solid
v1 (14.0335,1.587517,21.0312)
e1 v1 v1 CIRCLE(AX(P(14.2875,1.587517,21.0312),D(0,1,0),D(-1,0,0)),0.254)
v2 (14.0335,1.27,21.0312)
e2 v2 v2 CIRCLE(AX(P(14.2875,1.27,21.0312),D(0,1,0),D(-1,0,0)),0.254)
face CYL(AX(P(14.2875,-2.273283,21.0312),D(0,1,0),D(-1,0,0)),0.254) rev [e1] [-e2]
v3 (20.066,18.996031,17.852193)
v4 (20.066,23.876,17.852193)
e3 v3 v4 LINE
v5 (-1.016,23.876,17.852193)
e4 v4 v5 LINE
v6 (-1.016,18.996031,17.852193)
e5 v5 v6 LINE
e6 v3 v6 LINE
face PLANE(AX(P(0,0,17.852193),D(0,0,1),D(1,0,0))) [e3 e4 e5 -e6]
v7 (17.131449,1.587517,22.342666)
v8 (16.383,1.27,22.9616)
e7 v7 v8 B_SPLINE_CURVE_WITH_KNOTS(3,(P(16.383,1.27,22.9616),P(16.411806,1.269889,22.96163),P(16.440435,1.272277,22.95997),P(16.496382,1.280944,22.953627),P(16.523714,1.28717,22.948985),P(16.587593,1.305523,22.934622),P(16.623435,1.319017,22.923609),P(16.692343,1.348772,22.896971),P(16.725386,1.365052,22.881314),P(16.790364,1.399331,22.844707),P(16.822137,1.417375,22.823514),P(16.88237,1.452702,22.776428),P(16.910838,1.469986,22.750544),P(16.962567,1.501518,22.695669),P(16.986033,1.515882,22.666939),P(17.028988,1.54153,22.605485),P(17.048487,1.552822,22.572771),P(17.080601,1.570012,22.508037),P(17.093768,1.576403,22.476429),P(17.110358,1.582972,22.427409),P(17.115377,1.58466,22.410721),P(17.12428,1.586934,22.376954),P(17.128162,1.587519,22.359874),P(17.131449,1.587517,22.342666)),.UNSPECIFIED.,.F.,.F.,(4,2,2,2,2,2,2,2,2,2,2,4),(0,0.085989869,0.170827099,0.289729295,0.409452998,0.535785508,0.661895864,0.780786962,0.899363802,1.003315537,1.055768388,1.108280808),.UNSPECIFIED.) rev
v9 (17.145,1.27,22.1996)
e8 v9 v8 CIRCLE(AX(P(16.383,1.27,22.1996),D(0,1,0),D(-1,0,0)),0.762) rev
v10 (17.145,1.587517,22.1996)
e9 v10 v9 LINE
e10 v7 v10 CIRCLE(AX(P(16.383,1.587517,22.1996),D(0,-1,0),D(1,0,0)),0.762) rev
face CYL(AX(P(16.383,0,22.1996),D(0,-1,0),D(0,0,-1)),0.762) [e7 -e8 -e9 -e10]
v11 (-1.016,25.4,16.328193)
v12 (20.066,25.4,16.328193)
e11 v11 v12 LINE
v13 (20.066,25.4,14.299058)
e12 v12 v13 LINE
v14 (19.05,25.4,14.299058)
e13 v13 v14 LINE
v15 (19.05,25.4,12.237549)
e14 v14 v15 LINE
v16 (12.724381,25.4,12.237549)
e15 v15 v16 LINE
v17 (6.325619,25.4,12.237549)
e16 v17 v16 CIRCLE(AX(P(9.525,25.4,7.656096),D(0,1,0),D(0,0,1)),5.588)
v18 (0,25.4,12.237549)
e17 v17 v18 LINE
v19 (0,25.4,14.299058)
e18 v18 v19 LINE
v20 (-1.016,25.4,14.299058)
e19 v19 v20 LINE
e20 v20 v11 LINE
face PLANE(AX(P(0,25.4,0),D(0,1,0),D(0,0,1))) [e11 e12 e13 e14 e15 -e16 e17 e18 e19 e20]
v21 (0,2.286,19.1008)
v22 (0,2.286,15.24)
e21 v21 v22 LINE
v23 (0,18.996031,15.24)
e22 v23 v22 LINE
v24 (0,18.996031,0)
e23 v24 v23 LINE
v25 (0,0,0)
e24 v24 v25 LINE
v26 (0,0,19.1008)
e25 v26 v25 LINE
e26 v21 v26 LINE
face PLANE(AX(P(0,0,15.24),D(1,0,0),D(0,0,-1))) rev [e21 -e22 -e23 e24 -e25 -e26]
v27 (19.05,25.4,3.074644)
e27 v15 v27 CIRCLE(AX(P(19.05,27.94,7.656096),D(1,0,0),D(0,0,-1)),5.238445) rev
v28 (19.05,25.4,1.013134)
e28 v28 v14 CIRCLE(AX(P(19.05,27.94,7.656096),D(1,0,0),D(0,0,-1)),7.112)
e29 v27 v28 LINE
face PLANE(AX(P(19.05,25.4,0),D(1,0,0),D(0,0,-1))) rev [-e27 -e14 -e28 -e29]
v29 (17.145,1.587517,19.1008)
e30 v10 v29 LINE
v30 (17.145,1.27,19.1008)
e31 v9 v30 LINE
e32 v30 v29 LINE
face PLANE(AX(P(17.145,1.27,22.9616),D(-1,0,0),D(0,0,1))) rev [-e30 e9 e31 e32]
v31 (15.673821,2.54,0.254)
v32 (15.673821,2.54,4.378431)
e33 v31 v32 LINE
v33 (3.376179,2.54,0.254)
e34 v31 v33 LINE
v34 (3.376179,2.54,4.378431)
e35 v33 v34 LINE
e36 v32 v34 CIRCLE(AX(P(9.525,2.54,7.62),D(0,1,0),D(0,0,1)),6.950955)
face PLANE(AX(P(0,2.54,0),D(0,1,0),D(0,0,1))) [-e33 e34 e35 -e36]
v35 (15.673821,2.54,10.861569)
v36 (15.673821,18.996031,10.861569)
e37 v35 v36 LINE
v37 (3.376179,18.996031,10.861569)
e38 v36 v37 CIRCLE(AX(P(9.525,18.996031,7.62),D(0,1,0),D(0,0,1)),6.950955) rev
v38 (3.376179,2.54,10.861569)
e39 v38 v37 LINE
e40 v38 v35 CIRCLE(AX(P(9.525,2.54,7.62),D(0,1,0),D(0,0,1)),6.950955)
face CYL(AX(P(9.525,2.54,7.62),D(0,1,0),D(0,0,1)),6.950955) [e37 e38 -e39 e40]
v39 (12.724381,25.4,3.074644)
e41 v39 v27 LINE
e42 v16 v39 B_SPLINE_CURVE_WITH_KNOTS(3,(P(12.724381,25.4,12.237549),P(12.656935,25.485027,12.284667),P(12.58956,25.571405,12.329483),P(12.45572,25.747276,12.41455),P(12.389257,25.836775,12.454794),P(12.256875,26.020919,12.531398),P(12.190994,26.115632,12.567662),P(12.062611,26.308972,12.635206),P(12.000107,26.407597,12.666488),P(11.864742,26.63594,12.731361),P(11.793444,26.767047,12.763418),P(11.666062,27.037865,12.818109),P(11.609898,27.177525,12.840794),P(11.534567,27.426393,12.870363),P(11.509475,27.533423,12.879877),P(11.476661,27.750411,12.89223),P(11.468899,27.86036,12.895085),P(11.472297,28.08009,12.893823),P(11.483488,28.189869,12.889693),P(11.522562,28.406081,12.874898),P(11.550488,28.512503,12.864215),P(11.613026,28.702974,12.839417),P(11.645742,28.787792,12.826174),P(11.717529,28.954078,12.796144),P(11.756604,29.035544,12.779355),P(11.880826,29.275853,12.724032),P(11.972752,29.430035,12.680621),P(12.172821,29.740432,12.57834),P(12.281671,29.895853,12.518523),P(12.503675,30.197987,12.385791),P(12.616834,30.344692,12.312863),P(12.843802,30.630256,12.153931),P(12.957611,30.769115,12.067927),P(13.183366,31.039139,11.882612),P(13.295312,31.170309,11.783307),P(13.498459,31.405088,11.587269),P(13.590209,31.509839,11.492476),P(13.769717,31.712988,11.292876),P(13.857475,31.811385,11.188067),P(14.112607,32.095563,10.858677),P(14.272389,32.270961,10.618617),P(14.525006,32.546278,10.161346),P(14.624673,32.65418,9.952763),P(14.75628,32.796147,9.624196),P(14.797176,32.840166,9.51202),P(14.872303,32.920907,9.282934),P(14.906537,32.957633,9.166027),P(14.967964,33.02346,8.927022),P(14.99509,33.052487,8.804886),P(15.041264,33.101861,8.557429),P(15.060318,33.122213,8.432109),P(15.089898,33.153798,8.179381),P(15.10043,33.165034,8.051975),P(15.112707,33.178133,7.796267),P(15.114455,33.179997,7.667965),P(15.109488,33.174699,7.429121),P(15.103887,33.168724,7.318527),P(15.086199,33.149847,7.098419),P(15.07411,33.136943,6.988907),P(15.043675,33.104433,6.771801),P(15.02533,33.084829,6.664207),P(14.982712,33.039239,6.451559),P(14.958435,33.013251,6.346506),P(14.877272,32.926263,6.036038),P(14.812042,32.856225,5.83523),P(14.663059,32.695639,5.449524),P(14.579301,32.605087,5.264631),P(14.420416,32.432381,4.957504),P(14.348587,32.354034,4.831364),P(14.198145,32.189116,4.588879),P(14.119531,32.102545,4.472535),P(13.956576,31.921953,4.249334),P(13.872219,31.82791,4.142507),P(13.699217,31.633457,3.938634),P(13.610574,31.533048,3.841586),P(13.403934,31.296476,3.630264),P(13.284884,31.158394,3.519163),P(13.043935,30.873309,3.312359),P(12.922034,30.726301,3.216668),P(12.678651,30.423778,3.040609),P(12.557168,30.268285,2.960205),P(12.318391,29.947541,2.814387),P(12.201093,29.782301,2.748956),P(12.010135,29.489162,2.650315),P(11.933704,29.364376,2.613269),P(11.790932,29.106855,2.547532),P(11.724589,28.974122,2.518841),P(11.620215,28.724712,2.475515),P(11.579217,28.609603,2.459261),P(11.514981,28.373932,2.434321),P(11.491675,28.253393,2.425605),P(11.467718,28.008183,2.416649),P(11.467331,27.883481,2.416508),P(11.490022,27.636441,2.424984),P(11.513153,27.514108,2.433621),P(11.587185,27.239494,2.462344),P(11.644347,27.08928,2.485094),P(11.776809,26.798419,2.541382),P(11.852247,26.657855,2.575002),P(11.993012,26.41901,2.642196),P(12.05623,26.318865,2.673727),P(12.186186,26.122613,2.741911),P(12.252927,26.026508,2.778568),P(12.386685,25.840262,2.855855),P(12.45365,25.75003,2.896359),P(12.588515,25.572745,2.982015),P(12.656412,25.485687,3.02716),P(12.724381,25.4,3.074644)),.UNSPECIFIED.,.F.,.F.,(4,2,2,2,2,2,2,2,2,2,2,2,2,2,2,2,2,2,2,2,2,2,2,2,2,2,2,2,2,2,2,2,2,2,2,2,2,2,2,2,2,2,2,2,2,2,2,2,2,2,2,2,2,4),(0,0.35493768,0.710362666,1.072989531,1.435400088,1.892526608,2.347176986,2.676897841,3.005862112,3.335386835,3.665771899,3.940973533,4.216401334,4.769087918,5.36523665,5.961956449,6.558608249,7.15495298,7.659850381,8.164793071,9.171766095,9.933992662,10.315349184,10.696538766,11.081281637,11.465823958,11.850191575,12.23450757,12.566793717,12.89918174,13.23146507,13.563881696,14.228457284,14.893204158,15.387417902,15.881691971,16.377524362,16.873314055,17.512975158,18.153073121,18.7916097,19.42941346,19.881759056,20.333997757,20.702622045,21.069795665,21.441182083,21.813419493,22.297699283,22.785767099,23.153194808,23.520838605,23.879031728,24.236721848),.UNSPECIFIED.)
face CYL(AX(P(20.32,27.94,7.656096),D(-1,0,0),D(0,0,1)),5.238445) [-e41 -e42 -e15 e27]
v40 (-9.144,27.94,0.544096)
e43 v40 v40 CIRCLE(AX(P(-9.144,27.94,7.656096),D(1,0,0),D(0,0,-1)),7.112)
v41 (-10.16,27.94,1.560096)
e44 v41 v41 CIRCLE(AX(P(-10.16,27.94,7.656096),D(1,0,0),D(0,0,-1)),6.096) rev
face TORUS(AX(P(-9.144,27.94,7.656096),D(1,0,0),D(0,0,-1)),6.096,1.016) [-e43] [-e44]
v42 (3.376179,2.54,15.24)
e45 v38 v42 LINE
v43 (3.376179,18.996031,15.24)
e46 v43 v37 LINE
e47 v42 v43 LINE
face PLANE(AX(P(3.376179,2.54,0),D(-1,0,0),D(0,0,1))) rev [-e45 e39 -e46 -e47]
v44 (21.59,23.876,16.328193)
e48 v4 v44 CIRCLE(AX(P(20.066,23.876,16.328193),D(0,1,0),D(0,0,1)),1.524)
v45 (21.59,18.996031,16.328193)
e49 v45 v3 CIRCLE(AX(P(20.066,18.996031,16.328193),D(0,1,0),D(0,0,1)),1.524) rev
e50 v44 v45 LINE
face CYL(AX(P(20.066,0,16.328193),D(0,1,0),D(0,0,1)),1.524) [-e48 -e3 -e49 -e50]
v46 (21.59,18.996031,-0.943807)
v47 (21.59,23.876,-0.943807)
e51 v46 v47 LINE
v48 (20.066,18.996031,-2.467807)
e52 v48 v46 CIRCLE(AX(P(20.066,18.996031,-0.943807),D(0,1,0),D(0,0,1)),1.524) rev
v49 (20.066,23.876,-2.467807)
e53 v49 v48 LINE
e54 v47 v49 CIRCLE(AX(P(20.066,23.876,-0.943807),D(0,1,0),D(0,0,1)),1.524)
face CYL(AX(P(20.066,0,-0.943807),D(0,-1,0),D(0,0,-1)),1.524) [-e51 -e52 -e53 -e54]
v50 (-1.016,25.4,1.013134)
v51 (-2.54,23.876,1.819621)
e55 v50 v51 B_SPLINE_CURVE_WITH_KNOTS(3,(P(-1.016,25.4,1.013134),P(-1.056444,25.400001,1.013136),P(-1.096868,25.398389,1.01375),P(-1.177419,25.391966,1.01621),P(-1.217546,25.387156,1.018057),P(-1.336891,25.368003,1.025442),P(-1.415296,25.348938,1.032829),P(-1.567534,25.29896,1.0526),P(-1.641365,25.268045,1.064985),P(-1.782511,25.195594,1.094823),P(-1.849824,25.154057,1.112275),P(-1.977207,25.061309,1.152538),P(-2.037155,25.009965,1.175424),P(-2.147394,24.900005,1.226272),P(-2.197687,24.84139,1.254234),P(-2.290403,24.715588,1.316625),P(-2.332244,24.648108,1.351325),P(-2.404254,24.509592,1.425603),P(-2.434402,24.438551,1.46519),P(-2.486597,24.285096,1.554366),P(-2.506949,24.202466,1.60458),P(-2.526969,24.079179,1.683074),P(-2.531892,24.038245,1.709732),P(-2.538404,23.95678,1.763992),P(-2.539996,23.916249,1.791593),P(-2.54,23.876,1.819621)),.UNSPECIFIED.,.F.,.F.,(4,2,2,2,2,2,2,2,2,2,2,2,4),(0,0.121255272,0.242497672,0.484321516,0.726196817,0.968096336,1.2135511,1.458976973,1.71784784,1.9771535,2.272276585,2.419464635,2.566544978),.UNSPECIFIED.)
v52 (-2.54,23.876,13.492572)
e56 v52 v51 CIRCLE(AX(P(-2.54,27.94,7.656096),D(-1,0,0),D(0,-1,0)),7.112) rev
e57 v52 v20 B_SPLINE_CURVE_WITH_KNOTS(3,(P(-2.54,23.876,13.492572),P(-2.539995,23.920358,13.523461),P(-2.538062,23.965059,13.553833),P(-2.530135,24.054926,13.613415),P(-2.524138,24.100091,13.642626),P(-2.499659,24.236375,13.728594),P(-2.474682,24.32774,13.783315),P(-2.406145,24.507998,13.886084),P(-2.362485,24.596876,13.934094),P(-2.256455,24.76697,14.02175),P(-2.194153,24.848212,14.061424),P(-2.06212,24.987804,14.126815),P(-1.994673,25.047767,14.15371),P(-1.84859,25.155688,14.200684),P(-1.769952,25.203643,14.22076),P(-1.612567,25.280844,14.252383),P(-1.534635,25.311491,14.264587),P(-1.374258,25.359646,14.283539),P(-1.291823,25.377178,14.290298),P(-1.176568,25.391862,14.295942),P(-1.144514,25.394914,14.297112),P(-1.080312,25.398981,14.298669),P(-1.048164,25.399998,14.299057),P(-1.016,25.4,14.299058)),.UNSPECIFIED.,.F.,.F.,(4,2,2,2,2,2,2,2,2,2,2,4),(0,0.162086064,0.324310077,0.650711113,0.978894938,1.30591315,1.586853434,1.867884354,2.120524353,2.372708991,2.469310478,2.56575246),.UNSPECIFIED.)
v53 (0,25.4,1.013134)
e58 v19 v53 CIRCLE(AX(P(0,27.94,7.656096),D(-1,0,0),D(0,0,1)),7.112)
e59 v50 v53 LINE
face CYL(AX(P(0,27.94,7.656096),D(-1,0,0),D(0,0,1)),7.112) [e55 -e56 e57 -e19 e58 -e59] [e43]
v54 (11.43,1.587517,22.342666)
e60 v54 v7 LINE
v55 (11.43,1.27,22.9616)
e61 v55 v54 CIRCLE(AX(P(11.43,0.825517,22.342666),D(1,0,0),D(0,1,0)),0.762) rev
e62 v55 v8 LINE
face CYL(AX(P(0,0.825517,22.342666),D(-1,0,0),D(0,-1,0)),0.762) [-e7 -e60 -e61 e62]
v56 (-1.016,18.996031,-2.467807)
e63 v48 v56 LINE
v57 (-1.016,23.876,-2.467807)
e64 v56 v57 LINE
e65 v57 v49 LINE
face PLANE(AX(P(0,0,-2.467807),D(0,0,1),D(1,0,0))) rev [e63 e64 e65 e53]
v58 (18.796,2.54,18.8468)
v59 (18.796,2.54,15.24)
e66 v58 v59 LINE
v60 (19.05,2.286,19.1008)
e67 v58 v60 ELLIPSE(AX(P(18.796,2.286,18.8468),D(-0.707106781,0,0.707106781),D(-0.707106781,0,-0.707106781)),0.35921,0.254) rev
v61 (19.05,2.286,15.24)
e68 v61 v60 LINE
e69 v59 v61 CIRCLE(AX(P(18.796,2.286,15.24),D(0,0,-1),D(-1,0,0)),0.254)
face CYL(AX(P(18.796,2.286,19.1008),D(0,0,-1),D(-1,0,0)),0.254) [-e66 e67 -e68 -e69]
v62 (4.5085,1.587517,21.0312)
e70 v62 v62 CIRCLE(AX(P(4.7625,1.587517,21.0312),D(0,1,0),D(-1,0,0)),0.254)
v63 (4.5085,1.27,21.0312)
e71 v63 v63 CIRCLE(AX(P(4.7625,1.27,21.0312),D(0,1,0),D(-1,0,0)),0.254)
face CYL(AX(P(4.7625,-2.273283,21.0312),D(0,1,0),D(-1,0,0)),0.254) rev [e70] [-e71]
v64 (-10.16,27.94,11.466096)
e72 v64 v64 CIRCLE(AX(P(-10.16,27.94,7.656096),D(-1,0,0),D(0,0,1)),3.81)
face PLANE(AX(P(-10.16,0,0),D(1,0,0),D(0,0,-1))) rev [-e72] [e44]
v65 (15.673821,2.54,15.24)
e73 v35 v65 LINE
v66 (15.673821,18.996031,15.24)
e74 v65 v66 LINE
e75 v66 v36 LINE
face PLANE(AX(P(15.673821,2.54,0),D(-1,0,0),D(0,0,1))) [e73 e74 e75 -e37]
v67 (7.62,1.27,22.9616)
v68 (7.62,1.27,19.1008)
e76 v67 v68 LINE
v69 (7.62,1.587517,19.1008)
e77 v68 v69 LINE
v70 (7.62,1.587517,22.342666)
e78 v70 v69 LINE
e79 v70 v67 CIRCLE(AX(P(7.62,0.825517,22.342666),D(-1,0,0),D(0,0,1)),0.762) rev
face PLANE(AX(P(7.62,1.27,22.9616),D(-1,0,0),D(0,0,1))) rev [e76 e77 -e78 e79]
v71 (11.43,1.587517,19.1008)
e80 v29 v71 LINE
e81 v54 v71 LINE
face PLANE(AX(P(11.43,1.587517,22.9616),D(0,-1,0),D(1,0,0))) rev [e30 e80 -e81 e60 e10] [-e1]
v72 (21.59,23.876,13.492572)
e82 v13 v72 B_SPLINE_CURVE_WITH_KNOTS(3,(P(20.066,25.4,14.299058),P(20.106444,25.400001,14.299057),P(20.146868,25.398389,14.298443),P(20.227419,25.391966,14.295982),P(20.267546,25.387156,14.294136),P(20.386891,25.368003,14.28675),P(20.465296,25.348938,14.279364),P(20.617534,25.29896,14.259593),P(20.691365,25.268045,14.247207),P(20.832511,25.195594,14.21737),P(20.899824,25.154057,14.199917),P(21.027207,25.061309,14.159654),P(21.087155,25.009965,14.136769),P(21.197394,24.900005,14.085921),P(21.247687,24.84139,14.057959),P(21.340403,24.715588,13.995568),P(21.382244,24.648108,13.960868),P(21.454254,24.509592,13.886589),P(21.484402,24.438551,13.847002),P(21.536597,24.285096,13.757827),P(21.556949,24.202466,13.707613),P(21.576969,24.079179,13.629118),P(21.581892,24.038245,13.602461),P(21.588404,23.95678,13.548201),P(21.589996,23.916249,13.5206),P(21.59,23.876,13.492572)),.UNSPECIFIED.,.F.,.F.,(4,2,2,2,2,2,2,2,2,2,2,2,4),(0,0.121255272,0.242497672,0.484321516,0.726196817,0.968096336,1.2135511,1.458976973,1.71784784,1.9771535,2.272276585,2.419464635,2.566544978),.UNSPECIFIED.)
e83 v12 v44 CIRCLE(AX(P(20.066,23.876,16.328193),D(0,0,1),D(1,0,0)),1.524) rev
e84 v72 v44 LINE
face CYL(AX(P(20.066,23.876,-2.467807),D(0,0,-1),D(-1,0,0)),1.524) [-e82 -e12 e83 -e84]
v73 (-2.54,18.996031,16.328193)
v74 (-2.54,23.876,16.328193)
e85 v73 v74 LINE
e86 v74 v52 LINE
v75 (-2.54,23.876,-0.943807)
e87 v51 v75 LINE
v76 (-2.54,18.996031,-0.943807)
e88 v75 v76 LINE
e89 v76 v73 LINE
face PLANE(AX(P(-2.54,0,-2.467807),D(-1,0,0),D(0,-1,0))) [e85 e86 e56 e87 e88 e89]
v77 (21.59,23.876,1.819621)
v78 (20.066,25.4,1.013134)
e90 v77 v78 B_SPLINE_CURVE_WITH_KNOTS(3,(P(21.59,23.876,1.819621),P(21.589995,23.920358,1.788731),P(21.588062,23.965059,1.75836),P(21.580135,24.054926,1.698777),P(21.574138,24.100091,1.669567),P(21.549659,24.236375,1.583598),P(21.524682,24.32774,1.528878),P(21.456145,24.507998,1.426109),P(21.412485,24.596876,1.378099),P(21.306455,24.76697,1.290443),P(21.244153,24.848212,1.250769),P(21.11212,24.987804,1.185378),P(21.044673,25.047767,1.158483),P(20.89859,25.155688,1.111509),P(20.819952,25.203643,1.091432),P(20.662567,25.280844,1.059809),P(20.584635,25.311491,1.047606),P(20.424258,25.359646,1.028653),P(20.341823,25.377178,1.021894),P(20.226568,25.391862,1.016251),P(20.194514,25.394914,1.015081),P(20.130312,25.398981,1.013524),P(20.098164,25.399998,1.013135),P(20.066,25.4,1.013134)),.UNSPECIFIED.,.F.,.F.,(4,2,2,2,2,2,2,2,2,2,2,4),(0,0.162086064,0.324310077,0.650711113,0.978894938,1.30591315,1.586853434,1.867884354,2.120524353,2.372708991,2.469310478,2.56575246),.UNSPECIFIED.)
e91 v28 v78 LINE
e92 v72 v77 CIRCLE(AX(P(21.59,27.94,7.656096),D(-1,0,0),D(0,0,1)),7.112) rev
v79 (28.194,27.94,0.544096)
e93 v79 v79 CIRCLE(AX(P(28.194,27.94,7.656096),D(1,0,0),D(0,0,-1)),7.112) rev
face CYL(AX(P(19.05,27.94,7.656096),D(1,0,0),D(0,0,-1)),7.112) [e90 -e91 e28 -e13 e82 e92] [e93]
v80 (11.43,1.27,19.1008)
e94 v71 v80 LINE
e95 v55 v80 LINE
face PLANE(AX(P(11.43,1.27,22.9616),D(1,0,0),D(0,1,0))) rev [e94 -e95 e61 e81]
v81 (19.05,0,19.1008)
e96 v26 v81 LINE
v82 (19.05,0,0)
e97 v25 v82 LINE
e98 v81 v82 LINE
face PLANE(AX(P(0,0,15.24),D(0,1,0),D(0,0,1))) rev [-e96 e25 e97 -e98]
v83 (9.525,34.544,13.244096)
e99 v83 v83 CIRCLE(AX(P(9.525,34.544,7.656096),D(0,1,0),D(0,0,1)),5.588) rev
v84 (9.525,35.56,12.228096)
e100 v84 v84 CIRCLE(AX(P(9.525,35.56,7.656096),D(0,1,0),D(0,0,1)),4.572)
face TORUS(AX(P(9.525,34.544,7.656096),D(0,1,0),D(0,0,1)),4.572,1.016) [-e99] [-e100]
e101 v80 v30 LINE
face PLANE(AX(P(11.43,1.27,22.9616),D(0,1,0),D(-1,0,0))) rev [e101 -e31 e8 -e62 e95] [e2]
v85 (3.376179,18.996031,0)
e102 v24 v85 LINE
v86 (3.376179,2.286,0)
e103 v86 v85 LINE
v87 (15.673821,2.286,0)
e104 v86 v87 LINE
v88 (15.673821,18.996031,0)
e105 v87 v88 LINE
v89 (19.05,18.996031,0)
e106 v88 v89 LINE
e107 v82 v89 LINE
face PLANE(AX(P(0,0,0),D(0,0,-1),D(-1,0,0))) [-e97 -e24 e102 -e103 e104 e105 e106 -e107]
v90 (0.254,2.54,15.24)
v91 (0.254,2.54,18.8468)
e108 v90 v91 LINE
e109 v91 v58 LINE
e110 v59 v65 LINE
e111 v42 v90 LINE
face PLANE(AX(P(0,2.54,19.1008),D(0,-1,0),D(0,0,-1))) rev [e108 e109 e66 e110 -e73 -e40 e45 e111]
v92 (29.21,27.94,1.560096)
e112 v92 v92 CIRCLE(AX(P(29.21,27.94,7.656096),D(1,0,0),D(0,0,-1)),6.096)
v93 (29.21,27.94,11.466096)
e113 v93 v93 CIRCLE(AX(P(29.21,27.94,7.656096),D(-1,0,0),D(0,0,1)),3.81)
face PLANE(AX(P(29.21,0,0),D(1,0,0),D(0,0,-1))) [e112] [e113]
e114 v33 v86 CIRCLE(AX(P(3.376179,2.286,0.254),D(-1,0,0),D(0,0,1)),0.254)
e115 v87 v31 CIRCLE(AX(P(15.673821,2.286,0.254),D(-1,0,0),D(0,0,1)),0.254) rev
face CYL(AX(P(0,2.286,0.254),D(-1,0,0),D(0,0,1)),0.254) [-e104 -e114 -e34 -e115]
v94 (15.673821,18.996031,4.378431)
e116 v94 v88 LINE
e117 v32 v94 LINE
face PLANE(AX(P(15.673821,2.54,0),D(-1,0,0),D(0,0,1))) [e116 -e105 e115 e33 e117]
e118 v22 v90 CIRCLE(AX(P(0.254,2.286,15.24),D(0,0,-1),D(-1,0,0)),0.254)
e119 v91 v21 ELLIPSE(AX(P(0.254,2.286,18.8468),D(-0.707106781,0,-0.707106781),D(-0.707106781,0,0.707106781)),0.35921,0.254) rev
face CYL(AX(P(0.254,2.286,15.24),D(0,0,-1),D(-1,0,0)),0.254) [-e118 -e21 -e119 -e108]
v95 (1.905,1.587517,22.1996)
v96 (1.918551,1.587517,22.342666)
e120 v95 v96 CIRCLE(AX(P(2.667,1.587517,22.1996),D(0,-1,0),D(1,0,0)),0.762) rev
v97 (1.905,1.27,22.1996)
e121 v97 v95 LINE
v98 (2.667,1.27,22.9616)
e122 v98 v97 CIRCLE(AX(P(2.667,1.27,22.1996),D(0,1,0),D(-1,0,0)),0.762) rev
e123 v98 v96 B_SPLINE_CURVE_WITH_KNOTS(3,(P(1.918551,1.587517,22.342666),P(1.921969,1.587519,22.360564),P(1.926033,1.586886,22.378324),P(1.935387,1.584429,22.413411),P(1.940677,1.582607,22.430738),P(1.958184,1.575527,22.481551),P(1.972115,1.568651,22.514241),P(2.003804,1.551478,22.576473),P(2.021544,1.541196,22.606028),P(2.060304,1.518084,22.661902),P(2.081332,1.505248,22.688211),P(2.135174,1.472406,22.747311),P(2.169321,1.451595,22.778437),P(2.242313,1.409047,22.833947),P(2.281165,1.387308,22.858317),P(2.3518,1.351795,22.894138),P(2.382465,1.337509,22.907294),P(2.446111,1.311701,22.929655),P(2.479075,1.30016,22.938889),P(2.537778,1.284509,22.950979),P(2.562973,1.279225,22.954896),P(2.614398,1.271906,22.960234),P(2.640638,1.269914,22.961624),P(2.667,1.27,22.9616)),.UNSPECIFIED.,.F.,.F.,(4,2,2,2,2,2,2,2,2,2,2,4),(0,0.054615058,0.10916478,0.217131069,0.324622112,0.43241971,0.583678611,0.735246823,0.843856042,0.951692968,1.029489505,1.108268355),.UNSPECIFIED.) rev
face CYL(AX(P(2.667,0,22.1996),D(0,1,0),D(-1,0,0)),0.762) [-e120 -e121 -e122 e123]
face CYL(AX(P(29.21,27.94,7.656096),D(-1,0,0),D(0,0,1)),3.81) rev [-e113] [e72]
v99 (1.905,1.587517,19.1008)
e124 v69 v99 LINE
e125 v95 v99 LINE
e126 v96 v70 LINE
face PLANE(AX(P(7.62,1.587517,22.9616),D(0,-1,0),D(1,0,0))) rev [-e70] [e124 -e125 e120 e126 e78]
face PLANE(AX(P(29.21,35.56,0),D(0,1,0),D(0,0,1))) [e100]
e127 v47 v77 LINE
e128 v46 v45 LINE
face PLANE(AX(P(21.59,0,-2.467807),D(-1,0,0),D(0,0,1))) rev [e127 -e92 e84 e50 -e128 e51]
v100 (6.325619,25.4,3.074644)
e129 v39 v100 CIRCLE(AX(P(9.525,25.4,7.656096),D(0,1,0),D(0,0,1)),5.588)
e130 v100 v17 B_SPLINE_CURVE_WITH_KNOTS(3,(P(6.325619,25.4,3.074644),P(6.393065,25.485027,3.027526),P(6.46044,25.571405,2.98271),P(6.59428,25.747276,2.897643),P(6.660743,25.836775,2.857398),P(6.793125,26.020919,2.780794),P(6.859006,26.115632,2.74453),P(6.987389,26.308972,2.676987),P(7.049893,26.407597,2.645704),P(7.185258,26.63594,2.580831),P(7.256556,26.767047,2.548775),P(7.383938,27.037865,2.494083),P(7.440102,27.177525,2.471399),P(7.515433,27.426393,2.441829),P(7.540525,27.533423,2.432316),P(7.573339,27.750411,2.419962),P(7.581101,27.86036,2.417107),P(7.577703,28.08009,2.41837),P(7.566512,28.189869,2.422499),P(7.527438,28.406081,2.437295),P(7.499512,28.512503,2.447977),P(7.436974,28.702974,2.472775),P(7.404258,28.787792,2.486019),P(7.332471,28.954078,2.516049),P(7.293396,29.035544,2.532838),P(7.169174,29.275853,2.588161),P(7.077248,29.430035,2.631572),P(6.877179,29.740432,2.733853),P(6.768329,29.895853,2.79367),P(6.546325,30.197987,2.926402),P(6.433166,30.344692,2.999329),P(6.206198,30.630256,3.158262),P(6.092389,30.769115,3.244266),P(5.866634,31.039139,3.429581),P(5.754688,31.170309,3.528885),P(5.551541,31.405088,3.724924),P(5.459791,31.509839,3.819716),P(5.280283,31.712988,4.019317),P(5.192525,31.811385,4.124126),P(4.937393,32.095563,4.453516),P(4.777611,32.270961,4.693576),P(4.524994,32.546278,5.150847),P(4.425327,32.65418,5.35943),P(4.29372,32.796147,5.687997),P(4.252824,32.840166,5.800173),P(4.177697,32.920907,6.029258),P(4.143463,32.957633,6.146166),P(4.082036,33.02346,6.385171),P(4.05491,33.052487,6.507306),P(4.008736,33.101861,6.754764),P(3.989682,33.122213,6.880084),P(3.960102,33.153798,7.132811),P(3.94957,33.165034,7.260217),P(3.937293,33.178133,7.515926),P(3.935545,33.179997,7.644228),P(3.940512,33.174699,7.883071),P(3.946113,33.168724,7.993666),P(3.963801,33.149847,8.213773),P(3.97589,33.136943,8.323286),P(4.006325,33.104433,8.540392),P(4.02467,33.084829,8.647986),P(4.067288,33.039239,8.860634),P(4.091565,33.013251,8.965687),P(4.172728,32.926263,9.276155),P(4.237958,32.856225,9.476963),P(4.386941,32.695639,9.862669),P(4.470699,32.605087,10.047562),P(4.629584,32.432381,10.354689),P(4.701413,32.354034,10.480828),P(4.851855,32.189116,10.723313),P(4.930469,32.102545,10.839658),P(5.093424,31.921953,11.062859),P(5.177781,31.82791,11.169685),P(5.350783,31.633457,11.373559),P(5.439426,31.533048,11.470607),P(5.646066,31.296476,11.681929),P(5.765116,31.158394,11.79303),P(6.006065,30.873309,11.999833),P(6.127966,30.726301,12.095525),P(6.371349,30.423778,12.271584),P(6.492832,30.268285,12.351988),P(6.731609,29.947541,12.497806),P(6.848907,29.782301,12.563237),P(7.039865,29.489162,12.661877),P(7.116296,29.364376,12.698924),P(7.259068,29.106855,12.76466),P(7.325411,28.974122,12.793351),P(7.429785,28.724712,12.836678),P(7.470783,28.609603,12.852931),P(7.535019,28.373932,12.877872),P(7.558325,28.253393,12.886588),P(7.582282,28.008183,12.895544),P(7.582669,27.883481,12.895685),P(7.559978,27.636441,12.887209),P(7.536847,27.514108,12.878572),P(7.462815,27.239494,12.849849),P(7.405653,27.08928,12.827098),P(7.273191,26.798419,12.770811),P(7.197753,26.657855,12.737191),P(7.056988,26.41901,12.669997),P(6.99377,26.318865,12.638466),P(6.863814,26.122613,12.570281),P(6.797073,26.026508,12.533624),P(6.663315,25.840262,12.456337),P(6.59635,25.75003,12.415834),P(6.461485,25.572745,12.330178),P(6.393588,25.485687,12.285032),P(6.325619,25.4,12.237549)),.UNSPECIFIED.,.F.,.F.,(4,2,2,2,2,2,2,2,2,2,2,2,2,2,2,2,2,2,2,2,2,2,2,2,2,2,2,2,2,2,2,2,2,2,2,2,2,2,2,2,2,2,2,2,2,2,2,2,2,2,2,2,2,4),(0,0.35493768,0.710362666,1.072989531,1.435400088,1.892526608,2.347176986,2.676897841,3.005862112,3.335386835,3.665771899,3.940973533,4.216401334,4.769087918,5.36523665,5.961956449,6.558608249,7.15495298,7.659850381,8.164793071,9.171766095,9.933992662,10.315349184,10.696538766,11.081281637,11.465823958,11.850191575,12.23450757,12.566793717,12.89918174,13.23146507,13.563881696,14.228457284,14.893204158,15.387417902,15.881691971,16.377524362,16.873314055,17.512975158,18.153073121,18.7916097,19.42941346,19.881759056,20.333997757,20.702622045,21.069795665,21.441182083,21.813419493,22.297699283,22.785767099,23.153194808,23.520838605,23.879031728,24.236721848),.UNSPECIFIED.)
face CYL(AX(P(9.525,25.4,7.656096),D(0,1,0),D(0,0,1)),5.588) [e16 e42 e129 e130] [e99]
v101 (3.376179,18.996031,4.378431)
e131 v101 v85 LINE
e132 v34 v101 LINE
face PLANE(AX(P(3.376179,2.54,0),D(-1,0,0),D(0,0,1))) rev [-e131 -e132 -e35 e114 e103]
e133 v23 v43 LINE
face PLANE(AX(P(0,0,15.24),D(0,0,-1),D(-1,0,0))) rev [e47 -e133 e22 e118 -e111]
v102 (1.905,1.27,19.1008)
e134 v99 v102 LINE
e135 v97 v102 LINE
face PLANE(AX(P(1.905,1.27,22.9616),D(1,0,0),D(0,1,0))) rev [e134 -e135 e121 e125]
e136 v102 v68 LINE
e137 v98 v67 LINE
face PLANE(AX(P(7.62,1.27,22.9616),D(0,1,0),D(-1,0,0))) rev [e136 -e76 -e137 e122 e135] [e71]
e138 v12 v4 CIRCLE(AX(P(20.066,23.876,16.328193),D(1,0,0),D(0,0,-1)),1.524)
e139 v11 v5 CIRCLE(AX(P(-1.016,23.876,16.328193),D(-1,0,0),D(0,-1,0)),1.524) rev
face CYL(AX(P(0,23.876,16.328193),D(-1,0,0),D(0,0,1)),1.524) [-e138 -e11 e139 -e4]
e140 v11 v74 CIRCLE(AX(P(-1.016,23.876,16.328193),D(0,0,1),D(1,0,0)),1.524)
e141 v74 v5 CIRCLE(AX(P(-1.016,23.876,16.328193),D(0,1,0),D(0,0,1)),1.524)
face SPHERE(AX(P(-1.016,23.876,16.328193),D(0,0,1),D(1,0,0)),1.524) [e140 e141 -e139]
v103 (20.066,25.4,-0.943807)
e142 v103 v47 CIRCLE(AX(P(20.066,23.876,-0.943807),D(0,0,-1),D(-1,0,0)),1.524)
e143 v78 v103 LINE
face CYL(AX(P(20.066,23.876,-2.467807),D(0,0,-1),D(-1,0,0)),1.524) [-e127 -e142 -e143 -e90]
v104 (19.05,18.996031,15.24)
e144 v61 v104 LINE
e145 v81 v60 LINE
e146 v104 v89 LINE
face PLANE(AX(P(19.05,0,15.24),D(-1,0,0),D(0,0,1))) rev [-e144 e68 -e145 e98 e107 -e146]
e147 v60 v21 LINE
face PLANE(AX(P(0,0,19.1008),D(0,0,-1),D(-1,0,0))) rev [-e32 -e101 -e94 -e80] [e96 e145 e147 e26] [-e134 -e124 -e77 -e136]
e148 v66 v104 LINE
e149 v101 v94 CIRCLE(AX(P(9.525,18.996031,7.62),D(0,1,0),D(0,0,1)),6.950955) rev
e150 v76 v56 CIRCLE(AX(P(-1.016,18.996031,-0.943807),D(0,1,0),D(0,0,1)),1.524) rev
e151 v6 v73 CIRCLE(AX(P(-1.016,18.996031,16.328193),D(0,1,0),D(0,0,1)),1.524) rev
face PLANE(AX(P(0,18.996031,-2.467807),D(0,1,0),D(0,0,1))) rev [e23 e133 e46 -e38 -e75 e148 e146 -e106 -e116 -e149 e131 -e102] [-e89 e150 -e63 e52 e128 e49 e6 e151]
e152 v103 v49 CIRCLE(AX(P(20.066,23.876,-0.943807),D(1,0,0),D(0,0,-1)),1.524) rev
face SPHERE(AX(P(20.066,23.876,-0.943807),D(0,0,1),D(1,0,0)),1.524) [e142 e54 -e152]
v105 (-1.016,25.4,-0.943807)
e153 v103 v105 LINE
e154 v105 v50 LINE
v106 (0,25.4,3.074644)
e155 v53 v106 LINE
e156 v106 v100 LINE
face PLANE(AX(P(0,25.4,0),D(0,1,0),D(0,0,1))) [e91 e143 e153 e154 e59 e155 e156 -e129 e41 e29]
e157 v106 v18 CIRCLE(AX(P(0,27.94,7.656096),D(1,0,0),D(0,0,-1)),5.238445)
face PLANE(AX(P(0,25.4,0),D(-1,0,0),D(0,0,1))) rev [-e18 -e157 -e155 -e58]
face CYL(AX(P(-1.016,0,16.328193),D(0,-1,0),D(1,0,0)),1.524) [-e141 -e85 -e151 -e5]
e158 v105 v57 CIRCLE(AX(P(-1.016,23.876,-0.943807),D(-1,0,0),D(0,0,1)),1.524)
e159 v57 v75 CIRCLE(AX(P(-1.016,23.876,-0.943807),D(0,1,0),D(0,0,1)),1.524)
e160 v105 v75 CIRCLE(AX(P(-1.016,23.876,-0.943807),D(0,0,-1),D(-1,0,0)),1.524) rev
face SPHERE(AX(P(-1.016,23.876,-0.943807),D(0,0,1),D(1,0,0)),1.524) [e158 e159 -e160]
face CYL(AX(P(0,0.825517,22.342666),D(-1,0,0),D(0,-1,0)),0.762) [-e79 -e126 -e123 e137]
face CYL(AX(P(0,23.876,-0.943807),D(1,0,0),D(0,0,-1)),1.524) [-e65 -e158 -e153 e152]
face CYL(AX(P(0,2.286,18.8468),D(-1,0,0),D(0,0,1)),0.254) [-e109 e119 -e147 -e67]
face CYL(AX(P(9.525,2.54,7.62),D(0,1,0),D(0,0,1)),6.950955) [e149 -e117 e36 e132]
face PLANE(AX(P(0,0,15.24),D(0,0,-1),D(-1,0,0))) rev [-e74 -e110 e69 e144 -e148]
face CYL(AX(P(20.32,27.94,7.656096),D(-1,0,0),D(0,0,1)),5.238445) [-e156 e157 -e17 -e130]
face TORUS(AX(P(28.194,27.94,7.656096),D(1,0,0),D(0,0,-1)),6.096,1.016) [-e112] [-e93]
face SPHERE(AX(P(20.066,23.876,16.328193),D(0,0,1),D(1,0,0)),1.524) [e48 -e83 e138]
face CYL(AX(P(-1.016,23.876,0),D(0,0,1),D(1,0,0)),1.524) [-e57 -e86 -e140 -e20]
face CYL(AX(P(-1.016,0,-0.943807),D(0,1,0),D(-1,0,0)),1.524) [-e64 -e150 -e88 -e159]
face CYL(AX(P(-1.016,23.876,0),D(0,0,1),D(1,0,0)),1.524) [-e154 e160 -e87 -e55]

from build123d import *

# Parameters (mm, degrees)
SKETCH1_W                = 19.05
SKETCH1_H                = 19.05
BOSS_EXTRUDE1_DEPTH      = 15.24
SKETCH2_W                = 19.05
SKETCH2_H                = 2.54
BOSS_EXTRUDE2_DEPTH      = 3.8608
SKETCH3_W                = 5.715
SKETCH3_H                = 0.317516884
BOSS_EXTRUDE3_DEPTH      = 3.8608
SKETCH4_R                = 0.254
CUT_EXTRUDE1_DEPTH       = 3.8608
CUT_EXTRUDE2_DEPTH       = 16.51
BOSS_EXTRUDE4_DEPTH      = 10.16
BOSS_EXTRUDE4_DEPTH_BACK = 29.21
SKETCH6_W                = 15.312192665
SKETCH6_H                = 16.51
SKETCH7_OUTSIDE_W        = 36.524
SKETCH7_OUTSIDE_H        = 49.122
SKETCH7_OUTSIDE_R        = 7.112
CUT_EXTRUDE3_DEPTH       = 10.16
SKETCH8_OUTSIDE_W        = 36.524
SKETCH8_OUTSIDE_H        = 49.122
SKETCH8_OUTSIDE_R        = 7.112
CUT_EXTRUDE4_DEPTH       = 10.16
SKETCH9_W                = 19.05
SKETCH9_H                = 15.312192665
SKETCH9_R                = 5.588
CUT_EXTRUDE6_DEPTH       = 10.16
SKETCH10_R               = 5.238445082
BOSS_EXTRUDE5_DEPTH      = 20.32
BOSS_EXTRUDE6_DEPTH      = 2.54
BOSS_EXTRUDE6_DEPTH_BACK = 17.78
SKETCH11_W               = 19.05
SKETCH11_H               = 6.35
FILLET1_R                = 1.524
FILLET2_R                = 1.016
FILLET3_R                = 1.016
FILLET5_R                = 0.762
FILLET6_R                = 0.254
SKETCH12_R               = 3.81
CUT_EXTRUDE7_DEPTH       = 58.807833199


with BuildPart() as part:
    # Sketch1 → Boss-Extrude1 (new body)
    with BuildSketch(Plane.XY):
        with Locations((9.525, 9.525)):
            Rectangle(SKETCH1_W, SKETCH1_H)
    extrude(amount=BOSS_EXTRUDE1_DEPTH)

    # Sketch2 → Boss-Extrude2 (add)
    with BuildSketch(Plane.XY.offset(15.24)):
        with Locations((9.525, 1.27)):
            Rectangle(SKETCH2_W, SKETCH2_H)
    extrude(amount=BOSS_EXTRUDE2_DEPTH)

    # Sketch3 → Boss-Extrude3 (add)
    with BuildSketch(Plane.XY.offset(19.1008)):
        with Locations((14.2875, 1.428758442)):
            Rectangle(SKETCH3_W, SKETCH3_H)
        with Locations((4.7625, 1.428758442)):
            Rectangle(SKETCH3_W, SKETCH3_H)
    extrude(amount=BOSS_EXTRUDE3_DEPTH)

    # Sketch4 → Cut-Extrude1 (cut)
    with BuildSketch(Plane(origin=(0, 1.587516884, 0), x_dir=(1, 0, 0), z_dir=(0, 1, 0))):
        with Locations(Location((4.7625, -21.0312, 0), (0, 0, 180))):
            Circle(SKETCH4_R)
        with Locations(Location((14.2875, -21.0312, 0), (0, 0, 180))):
            Circle(SKETCH4_R)
    extrude(amount=-CUT_EXTRUDE1_DEPTH, mode=Mode.SUBTRACT)

    # Sketch5 → Cut-Extrude2 (cut)
    with BuildSketch(Plane(origin=(0, 19.05, 0), x_dir=(1, 0, 0), z_dir=(0, 1, 0))):
        with BuildLine():
            ThreePointArc((15.673821391, -10.861568969), (13.115527413, -13.571796937), (9.525, -14.57095489))
            Line((9.525, -14.57095489), (9.525, -15.24))
            Line((9.525, -15.24), (15.673821391, -15.24))
            Line((15.673821391, -15.24), (15.673821391, -10.861568969))
        make_face()
        with BuildLine():
            ThreePointArc((9.525, -14.57095489), (5.934472587, -13.571796937), (3.376178609, -10.861568969))
            Line((3.376178609, -10.861568969), (3.376178609, -15.24))
            Line((3.376178609, -15.24), (9.525, -15.24))
            Line((9.525, -15.24), (9.525, -14.57095489))
        make_face()
        with BuildLine():
            Line((9.525, 0), (3.376178609, 0))
            Line((3.376178609, 0), (3.376178609, -4.378431031))
            ThreePointArc((3.376178609, -4.378431031), (5.934472587, -1.668203063), (9.525, -0.66904511))
            Line((9.525, -0.66904511), (9.525, 0))
        make_face()
        with BuildLine():
            Line((15.673821391, 0), (9.525, 0))
            Line((9.525, 0), (9.525, -0.66904511))
            ThreePointArc((9.525, -0.66904511), (13.115527413, -1.668203063), (15.673821391, -4.378431031))
            Line((15.673821391, -4.378431031), (15.673821391, 0))
        make_face()
    extrude(amount=-CUT_EXTRUDE2_DEPTH, mode=Mode.SUBTRACT)

    # Sketch6 → Boss-Extrude4 (add, two sides: drawn at the far end of the back side and taken through both)
    with BuildSketch(Plane.ZY.offset(-BOSS_EXTRUDE4_DEPTH_BACK)):
        with Locations((7.656096333, 27.305)):
            Rectangle(SKETCH6_W, SKETCH6_H)
    extrude(amount=BOSS_EXTRUDE4_DEPTH + BOSS_EXTRUDE4_DEPTH_BACK)

    # Sketch7 outside → Cut-Extrude3 (cut)
    with BuildSketch(Plane.ZY.offset(10.16)):
        with Locations((11.481, 17.78)):
            Rectangle(SKETCH7_OUTSIDE_W, SKETCH7_OUTSIDE_H)
        with Locations((7.656096333, 27.94)):
            Circle(SKETCH7_OUTSIDE_R, mode=Mode.SUBTRACT)
    extrude(amount=-CUT_EXTRUDE3_DEPTH, mode=Mode.SUBTRACT)

    # Sketch8 outside → Cut-Extrude4 (cut)
    with BuildSketch(Plane(origin=(29.21, 0, 0), x_dir=(0, 0, -1), z_dir=(1, 0, 0))):
        with Locations((-11.481, 17.78)):
            Rectangle(SKETCH8_OUTSIDE_W, SKETCH8_OUTSIDE_H)
        with Locations(Location((-7.656096333, 27.94, 0), (0, 0, 180))):
            Circle(SKETCH8_OUTSIDE_R, mode=Mode.SUBTRACT)
    extrude(amount=-CUT_EXTRUDE4_DEPTH, mode=Mode.SUBTRACT)

    # Sketch9 → Cut-Extrude6 (cut)
    with BuildSketch(Plane(origin=(0, 35.56, 0), x_dir=(1, 0, 0), z_dir=(0, 1, 0))):
        with Locations((9.525, -7.656096333)):
            Rectangle(SKETCH9_W, SKETCH9_H)
        with Locations(Location((9.525, -7.656096333, 0), (0, 0, 270))):
            Circle(SKETCH9_R, mode=Mode.SUBTRACT)
    extrude(amount=-CUT_EXTRUDE6_DEPTH, mode=Mode.SUBTRACT)

    # Sketch10 → Boss-Extrude5 (add)
    with BuildSketch(Plane(origin=(0, 0, 0), x_dir=(0, 0, -1), z_dir=(1, 0, 0))):
        with Locations((-7.656096333, 27.94)):
            Circle(SKETCH10_R)
    extrude(amount=BOSS_EXTRUDE5_DEPTH)

    # Sketch11 → Boss-Extrude6 (add, two sides: drawn at the far end of the back side and taken through both)
    with BuildSketch(Plane.XY.offset(15.312192665).offset(-BOSS_EXTRUDE6_DEPTH_BACK)):
        with Locations((9.525, 22.225)):
            Rectangle(SKETCH11_W, SKETCH11_H)
        Polygon((0, 19.05), (0, 25.4), (-2.54, 25.4), (-2.54, 18.996030985), (0, 18.996030985), align=None)
        Polygon((21.59, 25.4), (19.05, 25.4), (19.05, 19.05), (0, 19.05), (0, 18.996030985), (21.59, 18.996030985), align=None)
    extrude(amount=BOSS_EXTRUDE6_DEPTH + BOSS_EXTRUDE6_DEPTH_BACK)

    # Fillet1
    fillet1_edges = [part.edges().sort_by_distance(p)[0] for p in [
        (-2.54, 25.4, 16.075625494),
        (9.525, 25.4, -2.467807335),
        (-2.54, 25.4, -0.727336496),
        (-2.54, 22.198015493, -2.467807335),
        (21.59, 25.4, 16.075625494),
        (21.59, 22.198015493, 17.852192665),
        (21.59, 25.4, -0.727336496),
        (21.59, 22.198015493, -2.467807335),
        (9.525, 25.4, 17.852192665),
        (-2.54, 22.198015493, 17.852192665),
    ]]
    fillet(fillet1_edges, radius=FILLET1_R)

    # Fillet2
    fillet2_edges = [part.edges().sort_by_distance(p)[0] for p in [
        (9.525, 35.56, 2.068096333),
    ]]
    fillet(fillet2_edges, radius=FILLET2_R)

    # Fillet3
    fillet3_edges = [part.edges().sort_by_distance(p)[0] for p in [
        (-10.16, 27.94, 0.544096333),
        (29.21, 27.94, 0.544096333),
    ]]
    fillet(fillet3_edges, radius=FILLET3_R)

    # Fillet5
    # the kernel refuses this fillet: 0.762 mm, written as the material it takes off along each edge
    with BuildSketch(Plane(origin=(17.145, 3.492516884, 22.9616), x_dir=(0, 0, -1), z_dir=(0, -1, 0)), Plane(origin=(1.905, -0.635, 22.9616), x_dir=(0, 0, -1), z_dir=(0, 1, 0))) as fillet5_piece_1:
        with BuildLine():
            CenterArc((FILLET5_R, -FILLET5_R), FILLET5_R, 90, 90)
            Line((0, -FILLET5_R), (-FILLET5_R * 0.02, -FILLET5_R))
            Line((-FILLET5_R * 0.02, -FILLET5_R), (-FILLET5_R * 0.02, FILLET5_R * 0.02))
            Line((-FILLET5_R * 0.02, FILLET5_R * 0.02), (FILLET5_R, FILLET5_R * 0.02))
            Line((FILLET5_R, FILLET5_R * 0.02), (FILLET5_R, 0))
        make_face()
    fillet5_piece_1_solid = extrude(amount=4.127516884, mode=Mode.PRIVATE)
    with BuildSketch(Plane(origin=(9.882666084, 1.587516884, 22.9616), x_dir=(0, 0, -1), z_dir=(1, 0, 0)), Plane(origin=(0.357666084, 1.587516884, 22.9616), x_dir=(0, 0, -1), z_dir=(1, 0, 0))) as fillet5_piece_2:
        with BuildLine():
            CenterArc((0.618933566, -0.762), FILLET5_R, 90, 54.316228291)
            Line((0, -0.317516884), (-0.012378671, -0.308627222))
            ThreePointArc((-0.012378671, -0.308627222), (-0.01524, -0.158758442), (-0.01524, 0))
            Line((-0.01524, 0), (0, 0.01524))
            Line((0, 0.01524), (0.618933566, 0.01524))
            Line((0.618933566, 0.01524), (0.618933566, 0))
        make_face()
    fillet5_piece_2_solid = extrude(amount=8.809667832, mode=Mode.PRIVATE)
    add([fillet5_piece_1_solid, fillet5_piece_2_solid], mode=Mode.SUBTRACT)

    # Fillet6
    fillet6_edges = [part.edges().sort_by_distance(p)[0] for p in [
        (0, 2.54, 17.1704),
        (19.05, 2.54, 17.1704),
        (9.525, 2.54, 19.1008),
        (9.525, 2.54, 0),
    ]]
    fillet(fillet6_edges, radius=FILLET6_R)

    # Sketch12 → Cut-Extrude7 (cut, through all)
    with BuildSketch(Plane.ZY.offset(10.16)):
        with Locations((7.656096333, 27.94)):
            Circle(SKETCH12_R)
    extrude(amount=-CUT_EXTRUDE7_DEPTH, mode=Mode.SUBTRACT)


solid = part.part
